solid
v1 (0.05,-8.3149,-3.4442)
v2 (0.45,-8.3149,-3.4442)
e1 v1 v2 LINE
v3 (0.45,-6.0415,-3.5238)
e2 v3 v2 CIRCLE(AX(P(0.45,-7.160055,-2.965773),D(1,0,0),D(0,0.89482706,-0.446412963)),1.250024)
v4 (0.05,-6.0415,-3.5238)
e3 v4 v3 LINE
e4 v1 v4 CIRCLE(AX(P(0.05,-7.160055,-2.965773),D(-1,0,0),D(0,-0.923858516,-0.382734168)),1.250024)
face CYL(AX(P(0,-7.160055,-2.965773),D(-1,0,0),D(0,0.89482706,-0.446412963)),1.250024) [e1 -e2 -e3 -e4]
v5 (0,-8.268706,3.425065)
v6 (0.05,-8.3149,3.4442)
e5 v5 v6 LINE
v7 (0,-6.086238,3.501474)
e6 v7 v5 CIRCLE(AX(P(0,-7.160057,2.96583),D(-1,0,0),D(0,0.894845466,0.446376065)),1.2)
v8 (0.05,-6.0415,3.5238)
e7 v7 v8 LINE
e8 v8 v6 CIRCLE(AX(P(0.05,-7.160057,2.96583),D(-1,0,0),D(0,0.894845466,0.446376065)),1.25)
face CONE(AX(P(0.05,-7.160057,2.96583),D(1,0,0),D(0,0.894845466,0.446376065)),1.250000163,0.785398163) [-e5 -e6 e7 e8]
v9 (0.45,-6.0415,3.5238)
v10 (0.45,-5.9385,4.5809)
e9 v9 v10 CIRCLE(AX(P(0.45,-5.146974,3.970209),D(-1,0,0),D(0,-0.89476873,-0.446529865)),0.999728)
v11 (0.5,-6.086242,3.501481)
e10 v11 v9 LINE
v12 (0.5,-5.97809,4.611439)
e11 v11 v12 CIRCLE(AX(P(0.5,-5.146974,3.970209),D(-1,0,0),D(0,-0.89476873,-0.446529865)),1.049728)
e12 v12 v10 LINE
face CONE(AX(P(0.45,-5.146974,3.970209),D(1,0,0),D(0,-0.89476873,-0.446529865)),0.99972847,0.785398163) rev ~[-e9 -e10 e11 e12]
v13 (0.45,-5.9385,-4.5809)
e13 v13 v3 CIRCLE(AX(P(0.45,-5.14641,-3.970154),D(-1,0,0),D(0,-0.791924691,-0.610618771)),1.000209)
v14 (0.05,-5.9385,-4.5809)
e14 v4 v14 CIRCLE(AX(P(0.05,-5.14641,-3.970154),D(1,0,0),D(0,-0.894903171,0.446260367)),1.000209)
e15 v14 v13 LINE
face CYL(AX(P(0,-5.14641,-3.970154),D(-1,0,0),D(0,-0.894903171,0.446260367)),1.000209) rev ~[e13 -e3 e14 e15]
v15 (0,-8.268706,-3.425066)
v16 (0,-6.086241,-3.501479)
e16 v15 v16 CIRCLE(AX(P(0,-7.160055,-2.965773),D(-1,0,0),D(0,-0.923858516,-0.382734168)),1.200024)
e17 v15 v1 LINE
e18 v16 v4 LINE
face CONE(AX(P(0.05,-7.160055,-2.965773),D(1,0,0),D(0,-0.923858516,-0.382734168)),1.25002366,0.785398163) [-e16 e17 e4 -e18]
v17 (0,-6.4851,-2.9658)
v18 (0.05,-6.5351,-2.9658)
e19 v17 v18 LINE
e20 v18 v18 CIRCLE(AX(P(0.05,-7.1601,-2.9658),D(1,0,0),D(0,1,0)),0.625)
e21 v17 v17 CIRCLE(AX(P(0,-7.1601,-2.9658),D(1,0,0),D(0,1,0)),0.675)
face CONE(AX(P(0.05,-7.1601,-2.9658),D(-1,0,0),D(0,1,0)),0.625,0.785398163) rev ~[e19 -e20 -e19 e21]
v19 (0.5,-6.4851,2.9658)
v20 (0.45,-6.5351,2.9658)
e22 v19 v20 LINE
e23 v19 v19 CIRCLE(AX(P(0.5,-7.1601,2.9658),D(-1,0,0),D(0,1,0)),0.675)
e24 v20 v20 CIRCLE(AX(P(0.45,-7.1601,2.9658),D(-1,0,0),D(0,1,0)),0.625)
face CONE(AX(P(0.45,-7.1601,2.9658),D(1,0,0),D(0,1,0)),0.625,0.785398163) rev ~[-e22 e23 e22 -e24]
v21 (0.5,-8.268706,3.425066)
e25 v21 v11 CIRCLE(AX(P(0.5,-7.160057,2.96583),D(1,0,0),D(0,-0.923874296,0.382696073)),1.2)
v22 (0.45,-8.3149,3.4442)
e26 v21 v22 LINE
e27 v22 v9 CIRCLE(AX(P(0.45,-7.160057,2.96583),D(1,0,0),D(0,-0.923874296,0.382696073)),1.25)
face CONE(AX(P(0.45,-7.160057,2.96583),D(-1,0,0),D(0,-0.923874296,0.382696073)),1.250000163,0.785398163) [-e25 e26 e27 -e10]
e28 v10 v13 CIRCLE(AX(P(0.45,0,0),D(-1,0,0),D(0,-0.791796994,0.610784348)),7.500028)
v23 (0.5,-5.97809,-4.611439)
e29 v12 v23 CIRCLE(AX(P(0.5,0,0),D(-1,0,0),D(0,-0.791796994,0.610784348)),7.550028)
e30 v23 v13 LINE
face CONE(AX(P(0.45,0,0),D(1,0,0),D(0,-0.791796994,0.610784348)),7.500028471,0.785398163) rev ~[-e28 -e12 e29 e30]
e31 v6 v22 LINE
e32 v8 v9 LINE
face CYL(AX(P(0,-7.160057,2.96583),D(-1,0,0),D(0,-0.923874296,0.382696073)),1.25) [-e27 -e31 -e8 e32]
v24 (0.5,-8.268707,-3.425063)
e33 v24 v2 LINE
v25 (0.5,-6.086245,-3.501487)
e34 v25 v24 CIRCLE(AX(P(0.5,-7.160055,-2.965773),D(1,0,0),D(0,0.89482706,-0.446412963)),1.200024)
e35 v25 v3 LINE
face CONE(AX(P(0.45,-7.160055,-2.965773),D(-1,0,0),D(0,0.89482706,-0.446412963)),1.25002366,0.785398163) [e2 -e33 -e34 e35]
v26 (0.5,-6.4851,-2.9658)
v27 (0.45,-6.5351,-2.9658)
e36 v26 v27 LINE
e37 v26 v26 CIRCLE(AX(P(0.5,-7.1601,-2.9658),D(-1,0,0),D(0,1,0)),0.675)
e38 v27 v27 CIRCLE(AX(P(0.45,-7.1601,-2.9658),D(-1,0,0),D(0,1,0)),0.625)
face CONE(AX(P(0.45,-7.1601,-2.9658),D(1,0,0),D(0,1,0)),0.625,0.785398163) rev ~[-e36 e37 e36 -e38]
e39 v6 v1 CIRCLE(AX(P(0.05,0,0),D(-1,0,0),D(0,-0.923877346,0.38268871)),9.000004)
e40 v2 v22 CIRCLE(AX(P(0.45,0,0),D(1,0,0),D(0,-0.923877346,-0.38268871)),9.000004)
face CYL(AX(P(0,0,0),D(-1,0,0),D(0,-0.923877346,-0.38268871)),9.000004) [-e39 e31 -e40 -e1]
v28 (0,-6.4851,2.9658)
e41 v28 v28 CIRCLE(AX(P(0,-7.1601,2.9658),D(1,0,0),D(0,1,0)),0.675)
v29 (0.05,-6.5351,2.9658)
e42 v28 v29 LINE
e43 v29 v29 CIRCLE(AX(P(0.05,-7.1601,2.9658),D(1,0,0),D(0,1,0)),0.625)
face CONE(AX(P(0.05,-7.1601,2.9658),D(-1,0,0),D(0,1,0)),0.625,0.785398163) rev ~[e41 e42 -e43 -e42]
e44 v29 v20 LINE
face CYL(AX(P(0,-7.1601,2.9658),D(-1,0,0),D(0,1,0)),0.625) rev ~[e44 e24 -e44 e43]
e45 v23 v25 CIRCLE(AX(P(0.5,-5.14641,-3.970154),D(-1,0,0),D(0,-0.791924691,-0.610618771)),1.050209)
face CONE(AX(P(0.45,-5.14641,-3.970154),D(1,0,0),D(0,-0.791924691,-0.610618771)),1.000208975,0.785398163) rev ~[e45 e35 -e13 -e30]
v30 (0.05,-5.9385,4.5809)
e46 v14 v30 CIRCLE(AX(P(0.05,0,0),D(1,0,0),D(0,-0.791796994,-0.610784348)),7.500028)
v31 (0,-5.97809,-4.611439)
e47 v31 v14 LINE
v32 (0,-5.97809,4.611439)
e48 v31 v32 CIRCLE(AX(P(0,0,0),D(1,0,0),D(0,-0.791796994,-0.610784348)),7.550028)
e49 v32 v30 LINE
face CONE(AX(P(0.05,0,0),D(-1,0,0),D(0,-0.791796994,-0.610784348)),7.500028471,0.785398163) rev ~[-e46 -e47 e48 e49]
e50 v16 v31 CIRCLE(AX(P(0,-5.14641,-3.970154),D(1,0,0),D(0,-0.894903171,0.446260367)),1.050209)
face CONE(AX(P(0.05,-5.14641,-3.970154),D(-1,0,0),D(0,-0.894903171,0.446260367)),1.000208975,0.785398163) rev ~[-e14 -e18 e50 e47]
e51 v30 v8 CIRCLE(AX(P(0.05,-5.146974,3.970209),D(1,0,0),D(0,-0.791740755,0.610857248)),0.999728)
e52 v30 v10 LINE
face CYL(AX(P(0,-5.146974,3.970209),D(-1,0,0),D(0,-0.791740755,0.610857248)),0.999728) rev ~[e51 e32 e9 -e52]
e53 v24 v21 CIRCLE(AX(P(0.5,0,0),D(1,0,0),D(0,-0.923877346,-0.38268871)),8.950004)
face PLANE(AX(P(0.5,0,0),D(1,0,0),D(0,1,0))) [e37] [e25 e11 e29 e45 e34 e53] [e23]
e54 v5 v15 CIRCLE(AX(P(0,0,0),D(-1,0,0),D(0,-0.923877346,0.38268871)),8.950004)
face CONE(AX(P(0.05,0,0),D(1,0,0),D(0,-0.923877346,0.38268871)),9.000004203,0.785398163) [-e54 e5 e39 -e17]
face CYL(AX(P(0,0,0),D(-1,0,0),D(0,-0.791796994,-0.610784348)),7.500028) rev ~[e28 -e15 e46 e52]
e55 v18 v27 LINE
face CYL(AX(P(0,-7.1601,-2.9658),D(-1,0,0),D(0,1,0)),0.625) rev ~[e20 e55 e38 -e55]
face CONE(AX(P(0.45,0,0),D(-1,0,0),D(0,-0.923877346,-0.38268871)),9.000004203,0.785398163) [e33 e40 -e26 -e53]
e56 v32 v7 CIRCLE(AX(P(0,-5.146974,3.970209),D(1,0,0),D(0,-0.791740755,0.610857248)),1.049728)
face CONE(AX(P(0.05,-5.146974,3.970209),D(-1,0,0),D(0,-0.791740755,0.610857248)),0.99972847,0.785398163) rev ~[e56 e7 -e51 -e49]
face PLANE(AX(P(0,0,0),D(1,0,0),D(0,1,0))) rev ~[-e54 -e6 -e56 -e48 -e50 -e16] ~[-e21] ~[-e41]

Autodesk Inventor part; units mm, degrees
ref_plane "YZ Plane" through (0, 0, 0) normal (1, 0, 0) x (0, 1, 0)
ref_plane "XZ Plane" through (0, 0, 0) normal (0, 1, 0) x (-1, 0, 0)
ref_plane "XY Plane" through (0, 0, 0) normal (0, 0, 1) x (1, 0, 0)
sketch "Szkic1" plane through (0, 0, 0) normal (1, 0, 0) x (0, 1, 0)
  arc A0 (-8.3149, -3.4442) -> (-8.3149, 3.4442) centre (0, 0) ccw
  arc A1 (-6.9291, -2.8701) -> (-6.694, -3.3823) centre (0, 0) ccw construction
  line L0 (0, 0) -> (-6.5826, 2.7266)
  line L1 (0, 0) -> (-6.5826, -2.7266)
  line L2 (-11.9129, 0) -> (12.4855, 0) projected
  circle A2 centre (-7.1601, 2.9658) radius 0.625
  line L3 (-6.9291, 2.8701) -> (-7.1601, 2.9658) construction
  arc A3 (-8.3149, 3.4442) -> (-6.0415, 3.5238) centre (-7.1601, 2.9658) ccw
  circle A4 centre (-7.1601, -2.9658) radius 0.625
  arc A5 (-6.3801, -3.9426) -> (-6.0415, -3.5238) centre (-7.1601, -2.9658) ccw construction
  arc A6 (-6.694, -3.3823) -> (-6.3801, -3.9426) centre (0, 0) ccw construction
  arc A7 (-6.3801, -3.9426) -> (-5.9385, -4.5809) centre (0, 0) ccw construction
  arc A8 (-6.694, 3.3823) -> (-6.9291, 2.8701) centre (0, 0) ccw construction
  line L4 (-6.5826, 2.7266) -> (-8.3149, 3.4442) construction
  line L5 (-6.5826, -2.7266) -> (-8.3149, -3.4442) construction
  arc A9 (-6.3801, 3.9426) -> (-6.694, 3.3823) centre (0, 0) ccw construction
  arc A10 (-5.9385, 4.5809) -> (-6.0415, 3.5238) centre (-5.1467, 3.9701) ccw
  arc A11 (-6.0415, -3.5238) -> (-5.9385, -4.5809) centre (-5.1467, -3.9701) ccw
  arc A12 (-5.9385, 4.5809) -> (-6.3801, 3.9426) centre (0, 0) ccw construction
  arc A13 (-6.0415, 3.5238) -> (-6.3801, 3.9426) centre (-7.1601, 2.9658) ccw construction
  arc A14 (-6.0415, -3.5238) -> (-8.3149, -3.4442) centre (-7.1601, -2.9658) ccw
  arc A15 (-5.9385, -4.5809) -> (-5.9385, 4.5809) centre (0, 0) ccw
  dimension "d0" = 18
  dimension "d1" = 15
  dimension "d2" = 45
  dimension "d3" = 1.25
  dimension "d4" = 0.25
  dimension "d5" = 2
extrude "Wyciągnięcie proste1" add sketch "Szkic1" along normal blind 0.5 contours A14 A11 A15 L2 A0 | L2 A15 A10 A3 A0
chamfer "Faza1" distance 0.05 angle 45 16 edges at (0.5, 7.5, 0) (0.5, -6.1419, -4.0672) (0.5, -7.1163, -1.7166) (0.5, 9, 0) (0.5, -7.1163, 1.7166) (0.5, -6.1419, 4.0672) (0, 7.5, 0) (0, -6.1419, -4.0672) (0, -7.1163, -1.7166) (0, 9, 0) (0, -7.1163, 1.7166) (0, -6.1419, 4.0672) (0, -7.7851, 2.9658) (0.5, -7.7851, 2.9658) (0, -7.7851, -2.9658) (0.5, -7.7851, -2.9658)
properties part number "Seger"
